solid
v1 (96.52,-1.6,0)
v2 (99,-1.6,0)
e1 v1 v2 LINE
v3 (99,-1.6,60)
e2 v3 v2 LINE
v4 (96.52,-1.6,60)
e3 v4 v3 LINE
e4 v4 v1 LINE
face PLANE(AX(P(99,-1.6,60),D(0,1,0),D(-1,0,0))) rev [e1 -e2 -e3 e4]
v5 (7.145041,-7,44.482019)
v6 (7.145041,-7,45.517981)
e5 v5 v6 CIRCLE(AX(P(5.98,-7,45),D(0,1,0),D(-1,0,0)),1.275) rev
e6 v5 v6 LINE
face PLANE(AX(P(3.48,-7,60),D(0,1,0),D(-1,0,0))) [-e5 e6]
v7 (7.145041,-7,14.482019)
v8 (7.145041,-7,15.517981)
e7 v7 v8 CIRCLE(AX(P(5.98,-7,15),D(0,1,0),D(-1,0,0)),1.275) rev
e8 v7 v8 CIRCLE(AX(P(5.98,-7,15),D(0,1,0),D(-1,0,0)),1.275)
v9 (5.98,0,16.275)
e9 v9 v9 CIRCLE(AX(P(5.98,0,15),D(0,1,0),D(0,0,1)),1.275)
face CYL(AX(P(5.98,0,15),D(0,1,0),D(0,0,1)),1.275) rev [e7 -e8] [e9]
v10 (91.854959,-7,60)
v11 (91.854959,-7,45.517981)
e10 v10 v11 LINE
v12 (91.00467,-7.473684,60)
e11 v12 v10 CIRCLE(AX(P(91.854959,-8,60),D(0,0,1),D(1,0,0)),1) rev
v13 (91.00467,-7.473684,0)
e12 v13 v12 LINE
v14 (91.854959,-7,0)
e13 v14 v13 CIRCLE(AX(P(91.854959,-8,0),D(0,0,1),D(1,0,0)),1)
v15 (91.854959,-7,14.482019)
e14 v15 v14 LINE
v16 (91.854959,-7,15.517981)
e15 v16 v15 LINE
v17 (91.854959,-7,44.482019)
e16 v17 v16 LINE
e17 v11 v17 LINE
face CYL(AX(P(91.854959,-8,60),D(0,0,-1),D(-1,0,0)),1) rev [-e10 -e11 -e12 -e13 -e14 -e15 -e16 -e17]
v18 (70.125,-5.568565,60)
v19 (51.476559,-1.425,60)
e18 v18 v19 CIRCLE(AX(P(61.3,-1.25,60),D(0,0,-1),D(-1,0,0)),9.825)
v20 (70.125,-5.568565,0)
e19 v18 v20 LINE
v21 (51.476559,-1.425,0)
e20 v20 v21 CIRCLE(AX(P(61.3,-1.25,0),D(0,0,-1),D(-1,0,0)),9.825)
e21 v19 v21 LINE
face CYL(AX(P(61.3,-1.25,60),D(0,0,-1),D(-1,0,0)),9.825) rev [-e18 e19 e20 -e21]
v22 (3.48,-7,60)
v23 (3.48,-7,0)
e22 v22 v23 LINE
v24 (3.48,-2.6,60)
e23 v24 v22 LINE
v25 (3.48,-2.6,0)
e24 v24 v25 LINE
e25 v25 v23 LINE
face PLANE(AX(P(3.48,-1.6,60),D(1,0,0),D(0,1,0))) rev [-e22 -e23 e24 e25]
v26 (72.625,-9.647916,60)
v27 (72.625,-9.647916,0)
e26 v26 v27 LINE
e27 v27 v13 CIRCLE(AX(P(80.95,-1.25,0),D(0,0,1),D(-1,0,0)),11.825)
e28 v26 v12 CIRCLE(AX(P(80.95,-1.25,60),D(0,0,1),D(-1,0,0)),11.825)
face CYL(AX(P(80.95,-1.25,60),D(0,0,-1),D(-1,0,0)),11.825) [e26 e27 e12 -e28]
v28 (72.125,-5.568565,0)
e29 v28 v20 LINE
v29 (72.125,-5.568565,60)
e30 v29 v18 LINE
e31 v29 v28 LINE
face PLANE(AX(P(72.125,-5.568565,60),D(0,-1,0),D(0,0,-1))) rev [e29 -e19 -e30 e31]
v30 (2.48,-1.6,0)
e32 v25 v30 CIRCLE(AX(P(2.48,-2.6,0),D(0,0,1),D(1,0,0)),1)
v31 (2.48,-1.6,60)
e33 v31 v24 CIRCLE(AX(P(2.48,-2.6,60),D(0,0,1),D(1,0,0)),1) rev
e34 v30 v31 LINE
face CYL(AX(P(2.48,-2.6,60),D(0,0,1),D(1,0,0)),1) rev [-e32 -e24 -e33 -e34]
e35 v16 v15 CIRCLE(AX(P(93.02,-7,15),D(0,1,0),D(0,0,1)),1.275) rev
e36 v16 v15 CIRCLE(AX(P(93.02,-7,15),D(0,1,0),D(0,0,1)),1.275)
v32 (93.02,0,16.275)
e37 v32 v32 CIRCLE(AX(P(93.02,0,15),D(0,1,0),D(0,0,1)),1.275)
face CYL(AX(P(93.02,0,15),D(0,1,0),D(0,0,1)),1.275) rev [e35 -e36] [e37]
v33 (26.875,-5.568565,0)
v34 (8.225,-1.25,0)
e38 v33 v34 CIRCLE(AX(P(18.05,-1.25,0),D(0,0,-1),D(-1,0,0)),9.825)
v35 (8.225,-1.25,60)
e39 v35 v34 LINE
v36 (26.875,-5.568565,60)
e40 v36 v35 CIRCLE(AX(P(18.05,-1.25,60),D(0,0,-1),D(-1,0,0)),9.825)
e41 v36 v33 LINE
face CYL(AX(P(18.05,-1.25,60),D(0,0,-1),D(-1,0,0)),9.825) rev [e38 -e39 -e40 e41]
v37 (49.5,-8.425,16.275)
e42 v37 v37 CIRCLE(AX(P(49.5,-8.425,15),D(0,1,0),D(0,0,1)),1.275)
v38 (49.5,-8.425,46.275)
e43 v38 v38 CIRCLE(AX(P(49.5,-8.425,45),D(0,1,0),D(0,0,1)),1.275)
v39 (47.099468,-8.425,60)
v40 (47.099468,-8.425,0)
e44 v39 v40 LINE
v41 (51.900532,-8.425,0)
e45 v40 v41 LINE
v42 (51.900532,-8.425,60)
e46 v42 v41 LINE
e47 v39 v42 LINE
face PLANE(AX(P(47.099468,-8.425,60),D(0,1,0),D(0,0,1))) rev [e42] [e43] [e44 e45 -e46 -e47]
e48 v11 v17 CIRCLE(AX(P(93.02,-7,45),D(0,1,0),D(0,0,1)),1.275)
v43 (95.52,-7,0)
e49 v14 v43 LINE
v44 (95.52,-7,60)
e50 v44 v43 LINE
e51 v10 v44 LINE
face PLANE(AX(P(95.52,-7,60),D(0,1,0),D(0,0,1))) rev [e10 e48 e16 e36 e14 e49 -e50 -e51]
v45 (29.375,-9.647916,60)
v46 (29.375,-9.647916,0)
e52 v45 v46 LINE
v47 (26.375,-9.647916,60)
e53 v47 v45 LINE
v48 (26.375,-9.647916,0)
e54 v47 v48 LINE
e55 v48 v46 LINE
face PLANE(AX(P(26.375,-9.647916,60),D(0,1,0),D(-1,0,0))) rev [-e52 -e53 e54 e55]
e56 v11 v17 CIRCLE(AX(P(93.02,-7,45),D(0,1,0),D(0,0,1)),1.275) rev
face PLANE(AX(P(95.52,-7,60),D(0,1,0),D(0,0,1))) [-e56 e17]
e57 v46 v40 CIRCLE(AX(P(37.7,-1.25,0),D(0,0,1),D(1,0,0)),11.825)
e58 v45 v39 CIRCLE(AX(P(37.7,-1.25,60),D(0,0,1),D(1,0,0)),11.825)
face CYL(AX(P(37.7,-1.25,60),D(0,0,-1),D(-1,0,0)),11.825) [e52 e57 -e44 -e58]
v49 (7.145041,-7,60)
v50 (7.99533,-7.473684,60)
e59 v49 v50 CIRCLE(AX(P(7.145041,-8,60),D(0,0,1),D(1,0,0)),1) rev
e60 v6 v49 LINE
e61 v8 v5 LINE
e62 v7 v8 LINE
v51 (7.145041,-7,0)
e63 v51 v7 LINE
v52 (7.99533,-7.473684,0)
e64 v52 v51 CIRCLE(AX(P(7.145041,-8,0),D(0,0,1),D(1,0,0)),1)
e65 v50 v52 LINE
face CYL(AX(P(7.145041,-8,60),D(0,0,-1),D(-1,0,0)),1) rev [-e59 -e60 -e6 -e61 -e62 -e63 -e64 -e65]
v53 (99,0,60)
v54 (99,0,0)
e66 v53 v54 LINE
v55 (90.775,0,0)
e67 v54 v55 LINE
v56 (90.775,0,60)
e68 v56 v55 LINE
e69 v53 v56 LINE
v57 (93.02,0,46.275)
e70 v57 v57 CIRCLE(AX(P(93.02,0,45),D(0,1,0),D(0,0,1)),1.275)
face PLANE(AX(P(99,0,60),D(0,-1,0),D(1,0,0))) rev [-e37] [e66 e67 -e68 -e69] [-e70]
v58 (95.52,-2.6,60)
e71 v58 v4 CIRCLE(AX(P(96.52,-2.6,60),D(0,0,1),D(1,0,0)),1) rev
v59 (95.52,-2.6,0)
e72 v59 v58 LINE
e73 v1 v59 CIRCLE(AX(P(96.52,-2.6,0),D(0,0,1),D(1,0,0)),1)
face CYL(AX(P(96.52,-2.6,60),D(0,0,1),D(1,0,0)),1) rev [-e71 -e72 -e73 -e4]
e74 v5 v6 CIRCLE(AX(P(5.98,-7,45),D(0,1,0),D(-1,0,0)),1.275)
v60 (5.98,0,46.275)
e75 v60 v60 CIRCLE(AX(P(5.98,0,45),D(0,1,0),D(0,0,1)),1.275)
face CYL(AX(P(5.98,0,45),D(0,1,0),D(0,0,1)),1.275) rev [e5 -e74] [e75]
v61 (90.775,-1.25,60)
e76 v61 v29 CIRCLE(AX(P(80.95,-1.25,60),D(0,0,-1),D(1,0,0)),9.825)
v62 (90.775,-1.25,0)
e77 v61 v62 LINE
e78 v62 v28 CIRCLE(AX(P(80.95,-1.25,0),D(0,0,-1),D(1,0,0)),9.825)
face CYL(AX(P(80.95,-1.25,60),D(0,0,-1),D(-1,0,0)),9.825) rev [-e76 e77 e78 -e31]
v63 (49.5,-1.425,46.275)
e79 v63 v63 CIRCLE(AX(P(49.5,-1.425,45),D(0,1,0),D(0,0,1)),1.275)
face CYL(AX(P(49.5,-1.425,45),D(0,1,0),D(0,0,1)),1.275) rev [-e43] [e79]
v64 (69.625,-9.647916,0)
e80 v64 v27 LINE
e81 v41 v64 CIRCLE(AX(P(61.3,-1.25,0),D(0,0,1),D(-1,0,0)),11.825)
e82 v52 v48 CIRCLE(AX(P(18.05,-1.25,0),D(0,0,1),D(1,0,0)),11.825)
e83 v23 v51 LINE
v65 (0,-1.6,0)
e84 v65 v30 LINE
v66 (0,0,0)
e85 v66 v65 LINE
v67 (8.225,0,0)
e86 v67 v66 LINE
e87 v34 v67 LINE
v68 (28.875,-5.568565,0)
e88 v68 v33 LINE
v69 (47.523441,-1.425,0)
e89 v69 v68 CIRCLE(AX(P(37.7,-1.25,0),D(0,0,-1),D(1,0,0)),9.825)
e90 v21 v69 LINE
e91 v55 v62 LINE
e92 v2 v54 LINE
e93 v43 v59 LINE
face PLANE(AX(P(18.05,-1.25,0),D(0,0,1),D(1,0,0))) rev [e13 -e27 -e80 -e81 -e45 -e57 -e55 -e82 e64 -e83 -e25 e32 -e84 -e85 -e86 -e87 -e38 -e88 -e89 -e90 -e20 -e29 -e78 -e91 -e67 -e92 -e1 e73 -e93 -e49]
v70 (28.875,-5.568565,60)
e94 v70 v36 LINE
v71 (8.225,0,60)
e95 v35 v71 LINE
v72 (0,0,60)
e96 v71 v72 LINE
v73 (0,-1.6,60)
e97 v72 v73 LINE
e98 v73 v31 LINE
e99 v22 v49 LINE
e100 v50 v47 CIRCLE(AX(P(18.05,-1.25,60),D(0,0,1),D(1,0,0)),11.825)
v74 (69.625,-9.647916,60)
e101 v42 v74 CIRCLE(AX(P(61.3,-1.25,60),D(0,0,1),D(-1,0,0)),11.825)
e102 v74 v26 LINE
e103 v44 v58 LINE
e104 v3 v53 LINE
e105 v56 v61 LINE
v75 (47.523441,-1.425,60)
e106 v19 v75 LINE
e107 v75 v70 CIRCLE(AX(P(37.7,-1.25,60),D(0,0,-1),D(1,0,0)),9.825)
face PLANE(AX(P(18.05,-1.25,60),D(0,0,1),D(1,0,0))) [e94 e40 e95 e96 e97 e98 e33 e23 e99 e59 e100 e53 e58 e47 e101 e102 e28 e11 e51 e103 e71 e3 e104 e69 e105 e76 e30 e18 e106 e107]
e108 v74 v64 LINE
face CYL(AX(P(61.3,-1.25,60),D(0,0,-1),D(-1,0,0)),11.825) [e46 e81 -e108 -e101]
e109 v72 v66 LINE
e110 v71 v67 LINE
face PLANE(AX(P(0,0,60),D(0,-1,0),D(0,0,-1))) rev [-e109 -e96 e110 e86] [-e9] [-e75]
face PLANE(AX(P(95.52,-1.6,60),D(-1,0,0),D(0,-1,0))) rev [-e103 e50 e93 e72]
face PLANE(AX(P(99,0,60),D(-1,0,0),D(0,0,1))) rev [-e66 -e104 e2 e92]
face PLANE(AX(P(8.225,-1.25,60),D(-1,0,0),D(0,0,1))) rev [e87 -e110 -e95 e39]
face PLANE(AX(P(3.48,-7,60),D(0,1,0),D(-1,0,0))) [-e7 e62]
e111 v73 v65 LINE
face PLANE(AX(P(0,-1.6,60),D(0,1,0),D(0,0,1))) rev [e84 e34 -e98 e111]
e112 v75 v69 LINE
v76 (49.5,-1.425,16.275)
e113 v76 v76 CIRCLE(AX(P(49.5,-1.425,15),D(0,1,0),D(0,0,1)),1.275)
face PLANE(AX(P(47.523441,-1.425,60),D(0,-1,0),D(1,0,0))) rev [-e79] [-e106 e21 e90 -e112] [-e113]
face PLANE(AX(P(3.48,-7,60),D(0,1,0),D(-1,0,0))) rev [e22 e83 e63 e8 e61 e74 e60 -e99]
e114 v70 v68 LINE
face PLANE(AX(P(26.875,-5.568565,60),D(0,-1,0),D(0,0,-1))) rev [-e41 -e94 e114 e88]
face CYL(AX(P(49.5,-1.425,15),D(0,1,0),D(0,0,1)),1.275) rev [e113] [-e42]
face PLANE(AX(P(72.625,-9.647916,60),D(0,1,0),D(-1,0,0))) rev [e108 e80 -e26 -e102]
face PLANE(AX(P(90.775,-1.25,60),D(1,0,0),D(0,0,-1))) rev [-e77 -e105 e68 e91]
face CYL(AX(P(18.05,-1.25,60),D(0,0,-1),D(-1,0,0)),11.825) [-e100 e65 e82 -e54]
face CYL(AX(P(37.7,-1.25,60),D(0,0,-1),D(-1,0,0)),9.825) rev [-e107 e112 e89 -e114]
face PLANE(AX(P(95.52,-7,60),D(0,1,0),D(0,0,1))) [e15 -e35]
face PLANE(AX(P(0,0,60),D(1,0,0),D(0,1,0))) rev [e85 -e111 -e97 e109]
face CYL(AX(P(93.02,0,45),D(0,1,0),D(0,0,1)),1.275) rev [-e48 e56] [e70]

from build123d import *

# Parameters (mm, degrees)
BOSS_EXTRUDE1_DEPTH                         = 60
FILLET1_R                                   = 1
TAPPED_START                                = -7
TAPPED_HOLE_FOR_M2_5X0_45_HELICOIL1_OUTL_R  = 1.275
TAPPED_HOLE_FOR_M2_5X0_45_HELICOIL1_DEPTH   = 7
TAPPED_START_2                              = -8.425
TAPPED_HOLE_FOR_M2_5X0_45_HELICOIL1_2_OU_R  = 1.275
TAPPED_HOLE_FOR_M2_5X0_45_HELICOIL1_2_DEPTH = 1.425


# Read off the part's stored shape, not the designer's step: Tapped Hole for M2.5x0.45 Helicoil1
with BuildPart() as part:
    # Sketch1 → Boss-Extrude1 (new body)
    with BuildSketch(Plane.XY):
        with BuildLine():
            Line((0, 0), (8.225, 0))
            Line((8.225, 0), (8.225, -1.25))
            ThreePointArc((8.225, -1.25), (15.833583974, -10.821735736), (26.875, -5.568564576))
            Line((26.875, -5.568564576), (28.875, -5.568564576))
            ThreePointArc((28.875, -5.568564576), (39.831080274, -10.841095968), (47.523441352, -1.425))
            Line((47.523441352, -1.425), (51.476558648, -1.425))
            ThreePointArc((51.476558648, -1.425), (59.168919726, -10.841095968), (70.125, -5.568564576))
            Line((70.125, -5.568564576), (72.125, -5.568564576))
            ThreePointArc((72.125, -5.568564576), (83.166416026, -10.821735736), (90.775, -1.25))
            Line((90.775, -1.25), (90.775, 0))
            Line((90.775, 0), (99, 0))
            Line((99, 0), (99, -1.6))
            Line((99, -1.6), (95.52, -1.6))
            Line((95.52, -1.6), (95.52, -7))
            Line((95.52, -7), (91.282866253, -7))
            ThreePointArc((91.282866253, -7), (82.611549593, -12.957684568), (72.625, -9.647916408))
            Line((72.625, -9.647916408), (69.625, -9.647916408))
            ThreePointArc((69.625, -9.647916408), (60.486058022, -13.046953991), (51.90053193, -8.425))
            Line((51.90053193, -8.425), (47.09946807, -8.425))
            ThreePointArc((47.09946807, -8.425), (38.513941978, -13.046953991), (29.375, -9.647916408))
            Line((29.375, -9.647916408), (26.375, -9.647916408))
            ThreePointArc((26.375, -9.647916408), (16.388450407, -12.957684568), (7.717133747, -7))
            Line((7.717133747, -7), (3.48, -7))
            Line((3.48, -7), (3.48, -1.6))
            Line((3.48, -1.6), (0, -1.6))
            Line((0, -1.6), (0, 0))
        make_face()
    extrude(amount=BOSS_EXTRUDE1_DEPTH)

    # Fillet1
    fillet1_edges = [part.edges().sort_by_distance(p)[0] for p in [
        (95.52, -1.6, 30),
        (91.282866253, -7, 30),
        (7.717133747, -7, 30),
        (3.48, -1.6, 30),
    ]]
    fillet(fillet1_edges, radius=FILLET1_R)

    # Tapped Hole for M2.5x0.45 Helicoil1 outl → Tapped Hole for M2.5x0.45 Helicoil1 (cut)
    with BuildSketch(Plane(origin=(0, 0, 0), x_dir=(1, 0, 0), z_dir=(0, 1, 0)).offset(TAPPED_START)):
        with Locations((93.02, -15)):
            Circle(TAPPED_HOLE_FOR_M2_5X0_45_HELICOIL1_OUTL_R)
        with Locations((93.02, -45)):
            Circle(TAPPED_HOLE_FOR_M2_5X0_45_HELICOIL1_OUTL_R)
        with Locations((49.5, -15)):
            Circle(TAPPED_HOLE_FOR_M2_5X0_45_HELICOIL1_OUTL_R)
        with Locations((49.5, -45)):
            Circle(TAPPED_HOLE_FOR_M2_5X0_45_HELICOIL1_OUTL_R)
    tapped_hole_for_m2_5x0_45_helicoil1 = extrude(amount=TAPPED_HOLE_FOR_M2_5X0_45_HELICOIL1_DEPTH, mode=Mode.SUBTRACT)

    # Tapped Hole for M2.5x0.45 Helicoil1 2 ou → Tapped Hole for M2.5x0.45 Helicoil1 2 (cut)
    with BuildSketch(Plane(origin=(0, 0, 0), x_dir=(1, 0, 0), z_dir=(0, 1, 0)).offset(TAPPED_START_2)):
        with Locations((49.5, -15)):
            Circle(TAPPED_HOLE_FOR_M2_5X0_45_HELICOIL1_2_OU_R)
        with Locations((49.5, -45)):
            Circle(TAPPED_HOLE_FOR_M2_5X0_45_HELICOIL1_2_OU_R)
    tapped_hole_for_m2_5x0_45_helicoil1_2 = extrude(amount=TAPPED_HOLE_FOR_M2_5X0_45_HELICOIL1_2_DEPTH, mode=Mode.SUBTRACT)

    # Mirror1: Tapped Hole for M2.5x0.45 Helicoil1, Tapped Hole for M2.5x0.45 Helicoil1 2 across plane
    add(tapped_hole_for_m2_5x0_45_helicoil1.mirror(Plane.ZY.offset(-49.5)), mode=Mode.SUBTRACT)
    add(tapped_hole_for_m2_5x0_45_helicoil1_2.mirror(Plane.ZY.offset(-49.5)), mode=Mode.SUBTRACT)


solid = part.part
